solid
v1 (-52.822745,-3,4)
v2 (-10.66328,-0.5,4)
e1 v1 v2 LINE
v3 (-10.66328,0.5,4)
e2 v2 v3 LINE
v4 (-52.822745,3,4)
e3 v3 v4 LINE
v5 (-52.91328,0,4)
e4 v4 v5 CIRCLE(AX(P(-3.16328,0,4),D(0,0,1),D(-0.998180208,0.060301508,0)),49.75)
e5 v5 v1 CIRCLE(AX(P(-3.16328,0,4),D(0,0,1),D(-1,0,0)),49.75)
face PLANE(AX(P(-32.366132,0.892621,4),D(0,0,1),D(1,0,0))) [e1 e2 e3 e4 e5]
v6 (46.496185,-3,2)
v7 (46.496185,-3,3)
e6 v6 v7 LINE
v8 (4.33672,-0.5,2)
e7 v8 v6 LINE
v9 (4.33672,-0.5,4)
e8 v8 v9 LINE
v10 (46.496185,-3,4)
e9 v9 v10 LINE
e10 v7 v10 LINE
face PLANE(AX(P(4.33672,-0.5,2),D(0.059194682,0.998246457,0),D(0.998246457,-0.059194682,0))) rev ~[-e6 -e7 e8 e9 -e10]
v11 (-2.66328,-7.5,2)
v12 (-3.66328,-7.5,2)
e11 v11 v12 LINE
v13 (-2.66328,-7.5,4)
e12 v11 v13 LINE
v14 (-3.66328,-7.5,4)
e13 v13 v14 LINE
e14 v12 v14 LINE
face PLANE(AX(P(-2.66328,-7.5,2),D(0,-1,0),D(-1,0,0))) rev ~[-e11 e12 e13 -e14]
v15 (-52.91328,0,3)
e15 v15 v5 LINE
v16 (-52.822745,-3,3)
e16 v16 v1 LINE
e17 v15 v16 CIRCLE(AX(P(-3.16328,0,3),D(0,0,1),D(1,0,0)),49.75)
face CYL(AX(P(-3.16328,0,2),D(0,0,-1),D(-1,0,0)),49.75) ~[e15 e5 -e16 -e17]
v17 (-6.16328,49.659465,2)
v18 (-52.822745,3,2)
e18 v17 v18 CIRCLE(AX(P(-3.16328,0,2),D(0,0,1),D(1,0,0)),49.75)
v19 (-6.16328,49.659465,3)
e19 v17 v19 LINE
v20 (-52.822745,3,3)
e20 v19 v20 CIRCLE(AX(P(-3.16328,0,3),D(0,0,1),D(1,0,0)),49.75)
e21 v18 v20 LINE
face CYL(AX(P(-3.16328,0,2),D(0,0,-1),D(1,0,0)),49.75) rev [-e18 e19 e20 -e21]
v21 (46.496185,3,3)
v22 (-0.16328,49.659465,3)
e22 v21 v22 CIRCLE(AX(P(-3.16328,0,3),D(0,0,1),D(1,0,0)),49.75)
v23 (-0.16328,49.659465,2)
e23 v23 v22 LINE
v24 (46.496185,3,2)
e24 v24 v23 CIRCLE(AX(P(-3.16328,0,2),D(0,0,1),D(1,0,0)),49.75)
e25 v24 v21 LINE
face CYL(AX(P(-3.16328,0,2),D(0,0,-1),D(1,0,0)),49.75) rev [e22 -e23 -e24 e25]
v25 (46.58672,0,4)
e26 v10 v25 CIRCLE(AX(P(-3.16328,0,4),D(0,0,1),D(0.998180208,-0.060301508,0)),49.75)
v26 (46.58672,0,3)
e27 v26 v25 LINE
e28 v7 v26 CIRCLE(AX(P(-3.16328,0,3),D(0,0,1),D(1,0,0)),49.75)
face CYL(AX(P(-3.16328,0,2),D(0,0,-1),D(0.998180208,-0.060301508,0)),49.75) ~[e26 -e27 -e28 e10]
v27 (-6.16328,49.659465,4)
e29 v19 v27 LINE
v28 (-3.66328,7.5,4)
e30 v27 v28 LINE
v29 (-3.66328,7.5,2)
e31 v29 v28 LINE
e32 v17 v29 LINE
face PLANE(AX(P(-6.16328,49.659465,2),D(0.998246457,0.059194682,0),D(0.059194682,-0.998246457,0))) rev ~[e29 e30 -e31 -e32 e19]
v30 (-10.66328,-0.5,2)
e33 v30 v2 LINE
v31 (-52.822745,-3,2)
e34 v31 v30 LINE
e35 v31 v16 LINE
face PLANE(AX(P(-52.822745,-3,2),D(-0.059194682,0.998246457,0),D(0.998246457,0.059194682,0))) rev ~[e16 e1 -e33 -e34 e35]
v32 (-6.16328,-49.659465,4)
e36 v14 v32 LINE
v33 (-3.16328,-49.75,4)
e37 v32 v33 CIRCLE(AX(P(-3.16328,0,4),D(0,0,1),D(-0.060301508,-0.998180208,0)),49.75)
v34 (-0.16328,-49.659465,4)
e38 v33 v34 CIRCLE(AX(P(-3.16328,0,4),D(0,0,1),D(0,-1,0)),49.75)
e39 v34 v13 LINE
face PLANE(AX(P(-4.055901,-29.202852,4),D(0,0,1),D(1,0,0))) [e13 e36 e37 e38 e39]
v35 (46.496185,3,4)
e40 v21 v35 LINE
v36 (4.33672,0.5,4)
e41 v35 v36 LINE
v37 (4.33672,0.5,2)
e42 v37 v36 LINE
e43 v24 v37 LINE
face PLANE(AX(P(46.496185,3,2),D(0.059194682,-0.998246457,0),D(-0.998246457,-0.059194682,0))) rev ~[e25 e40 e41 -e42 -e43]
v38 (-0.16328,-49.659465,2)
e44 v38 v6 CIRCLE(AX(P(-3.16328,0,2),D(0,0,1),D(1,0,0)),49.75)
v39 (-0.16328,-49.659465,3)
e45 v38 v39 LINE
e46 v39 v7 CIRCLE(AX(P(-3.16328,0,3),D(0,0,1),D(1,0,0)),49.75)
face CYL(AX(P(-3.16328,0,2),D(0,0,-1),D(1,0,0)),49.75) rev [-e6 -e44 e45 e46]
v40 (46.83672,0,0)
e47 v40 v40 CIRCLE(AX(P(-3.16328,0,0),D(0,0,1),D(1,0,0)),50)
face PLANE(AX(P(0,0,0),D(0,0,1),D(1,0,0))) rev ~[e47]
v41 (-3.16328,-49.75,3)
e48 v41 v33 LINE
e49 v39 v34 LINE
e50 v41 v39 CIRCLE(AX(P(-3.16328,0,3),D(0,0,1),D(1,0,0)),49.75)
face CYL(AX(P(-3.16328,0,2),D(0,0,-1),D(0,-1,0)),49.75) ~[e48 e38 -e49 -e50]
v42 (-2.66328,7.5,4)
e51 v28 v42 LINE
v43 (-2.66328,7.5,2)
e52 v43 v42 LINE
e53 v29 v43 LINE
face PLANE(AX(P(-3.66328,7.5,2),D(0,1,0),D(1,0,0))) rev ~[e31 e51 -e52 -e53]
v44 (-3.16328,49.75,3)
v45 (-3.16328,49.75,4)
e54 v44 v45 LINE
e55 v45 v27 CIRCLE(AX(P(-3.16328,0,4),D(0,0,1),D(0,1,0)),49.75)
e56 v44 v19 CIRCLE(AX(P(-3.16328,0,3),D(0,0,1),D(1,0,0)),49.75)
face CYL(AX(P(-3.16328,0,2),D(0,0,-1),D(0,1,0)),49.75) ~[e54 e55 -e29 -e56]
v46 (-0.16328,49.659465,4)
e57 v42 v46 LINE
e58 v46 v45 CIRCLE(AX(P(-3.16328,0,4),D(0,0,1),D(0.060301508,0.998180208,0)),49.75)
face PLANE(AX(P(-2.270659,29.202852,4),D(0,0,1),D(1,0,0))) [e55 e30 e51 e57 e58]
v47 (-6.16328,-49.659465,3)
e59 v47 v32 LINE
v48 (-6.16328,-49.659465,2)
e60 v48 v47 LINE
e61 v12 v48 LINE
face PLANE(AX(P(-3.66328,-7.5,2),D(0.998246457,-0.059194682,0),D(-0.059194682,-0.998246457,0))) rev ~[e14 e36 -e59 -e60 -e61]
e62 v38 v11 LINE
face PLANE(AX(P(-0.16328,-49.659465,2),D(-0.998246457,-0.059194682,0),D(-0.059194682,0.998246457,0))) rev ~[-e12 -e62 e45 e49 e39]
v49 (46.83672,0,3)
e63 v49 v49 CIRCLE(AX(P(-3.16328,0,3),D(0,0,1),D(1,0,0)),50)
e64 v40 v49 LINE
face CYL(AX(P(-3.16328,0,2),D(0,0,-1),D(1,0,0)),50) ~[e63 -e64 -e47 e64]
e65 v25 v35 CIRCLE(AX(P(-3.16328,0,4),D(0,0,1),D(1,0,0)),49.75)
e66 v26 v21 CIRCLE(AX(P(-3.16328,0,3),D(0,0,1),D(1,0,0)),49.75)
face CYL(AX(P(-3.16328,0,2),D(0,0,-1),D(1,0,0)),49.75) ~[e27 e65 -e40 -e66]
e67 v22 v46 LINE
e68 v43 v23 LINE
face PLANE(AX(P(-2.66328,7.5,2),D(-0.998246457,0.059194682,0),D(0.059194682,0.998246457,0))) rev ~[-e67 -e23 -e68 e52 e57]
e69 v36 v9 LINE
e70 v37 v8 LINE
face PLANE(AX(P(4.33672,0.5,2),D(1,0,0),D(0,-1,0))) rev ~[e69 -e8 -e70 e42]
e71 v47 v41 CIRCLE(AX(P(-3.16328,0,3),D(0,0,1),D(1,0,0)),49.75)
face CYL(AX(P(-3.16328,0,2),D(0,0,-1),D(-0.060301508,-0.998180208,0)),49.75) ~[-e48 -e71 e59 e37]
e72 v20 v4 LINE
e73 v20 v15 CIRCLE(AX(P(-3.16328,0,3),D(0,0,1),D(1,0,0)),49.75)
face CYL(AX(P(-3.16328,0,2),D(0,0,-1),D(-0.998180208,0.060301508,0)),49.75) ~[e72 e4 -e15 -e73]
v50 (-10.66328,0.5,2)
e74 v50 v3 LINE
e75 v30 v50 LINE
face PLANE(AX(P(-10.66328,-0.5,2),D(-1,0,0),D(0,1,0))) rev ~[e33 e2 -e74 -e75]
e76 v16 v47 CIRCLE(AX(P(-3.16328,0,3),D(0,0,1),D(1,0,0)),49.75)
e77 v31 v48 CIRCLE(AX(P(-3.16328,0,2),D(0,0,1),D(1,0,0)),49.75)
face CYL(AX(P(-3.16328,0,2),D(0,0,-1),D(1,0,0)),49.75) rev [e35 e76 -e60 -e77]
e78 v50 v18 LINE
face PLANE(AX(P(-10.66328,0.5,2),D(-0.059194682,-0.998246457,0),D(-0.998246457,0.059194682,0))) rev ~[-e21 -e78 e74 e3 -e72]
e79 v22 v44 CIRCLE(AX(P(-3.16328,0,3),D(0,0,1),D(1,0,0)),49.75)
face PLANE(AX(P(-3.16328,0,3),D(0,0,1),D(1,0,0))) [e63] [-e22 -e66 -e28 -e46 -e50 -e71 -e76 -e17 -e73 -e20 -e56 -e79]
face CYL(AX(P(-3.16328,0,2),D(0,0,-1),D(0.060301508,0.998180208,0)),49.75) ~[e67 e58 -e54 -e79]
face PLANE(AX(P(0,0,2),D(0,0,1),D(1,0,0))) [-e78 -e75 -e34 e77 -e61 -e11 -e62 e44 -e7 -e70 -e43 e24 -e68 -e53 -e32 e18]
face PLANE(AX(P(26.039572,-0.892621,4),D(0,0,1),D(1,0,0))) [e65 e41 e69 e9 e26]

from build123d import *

# Parameters (mm, degrees)
F0_W      = 150
F0_H      = 140
F1_DEPTH  = 2
F2_R      = 2.5
F3_DEPTH  = 2.001
F4_R      = 50
F4_R_2    = 49.75
F5_DEPTH  = 1
F7_DEPTH  = 2
F8_DEPTH  = 25
F9_DEPTH  = 2.001
F10_DEPTH = 25


# Not quite as in the source:
# - a feature names something its author has since deleted; it is built from what else it names


with BuildPart() as f1:
    # F0 (on Top) → F1 (new body)
    with BuildSketch(Plane.XY):
        Rectangle(F0_W, F0_H)
    extrude(amount=F1_DEPTH)

    # F2 (on face) → F3 (cut, through all)
    with BuildSketch(Plane.XY.offset(2)):
        Polygon((-75, 70), (-75, 41.5), (-46.5, 70), align=None)
        with Locations((-64, 57.6)):
            Circle(F2_R, mode=Mode.SUBTRACT)
        Polygon((-46.5, -70), (-75, -41.5), (-75, -70), align=None)
        with Locations((-64, -57.6)):
            Circle(F2_R, mode=Mode.SUBTRACT)
        with BuildLine():
            Line((-67.1845650673, -7), (-67.1845650673, 7))
            ThreePointArc((-67.1845650673, 7), (-67.9167981143, 8.767766953), (-69.6845650673, 9.5))
            Line((-69.6845650673, 9.5), (-75, 9.5))
            Line((-75, 9.5), (-75, -9.5))
            Line((-75, -9.5), (-69.6845650673, -9.5))
            ThreePointArc((-69.6845650673, -9.5), (-67.9167981143, -8.767766953), (-67.1845650673, -7))
        make_face()
        with BuildLine():
            Line((-26.5348799016, -66.5942596452), (-27.945, -70))
            Line((-27.945, -70), (-15, -70))
            Line((-15, -70), (-16.5005719841, -66.5208040123))
            ThreePointArc((-16.5005719841, -66.5208040123), (-21.5420765789, -63.2311459437), (-26.5348799016, -66.5942596452))
        make_face()
        with BuildLine():
            Line((-15, 70), (-27.945, 70))
            Line((-27.945, 70), (-26.6428877925, 66.4417666182))
            ThreePointArc((-26.6428877925, 66.4417666182), (-21.596779976, 63.2315774362), (-16.6462859149, 66.5873377421))
            Line((-16.6462859149, 66.5873377421), (-15, 70))
        make_face()
        with Locations((-64, 57.6)):
            Circle(F2_R)
        with Locations((-64, -57.6)):
            Circle(F2_R)
    extrude(amount=-F3_DEPTH, mode=Mode.SUBTRACT)

    # F4 (on face) → F5 (join)
    with BuildSketch(Plane.XY.offset(2)):
        with Locations((-3.16328, 0)):
            Circle(F4_R)
        with Locations((-3.16328, 0)):
            Circle(F4_R_2, mode=Mode.SUBTRACT)
    extrude(amount=F5_DEPTH)

    # F6 (on face) → F7 (join)
    with BuildSketch(Plane.XY.offset(2)):
        with BuildLine():
            Line((-3.16328, 49.75), (-3.16328, 7.5))
            Line((-3.16328, 7.5), (-2.66328, 7.5))
            Line((-2.66328, 7.5), (-0.16328, 49.6594653616))
            ThreePointArc((-0.16328, 49.6594653616), (-1.662597112, 49.7273611895), (-3.16328, 49.75))
        make_face()
        with BuildLine():
            Line((46.58672, 0), (4.33672, 0))
            Line((4.33672, 0), (4.33672, -0.5))
            Line((4.33672, -0.5), (46.4961853616, -3))
            ThreePointArc((46.4961853616, -3), (46.5640811895, -1.500682888), (46.58672, 0))
        make_face()
        with BuildLine():
            ThreePointArc((-52.8227453616, 3), (-52.8906411895, 1.500682888), (-52.91328, 0))
            Line((-52.91328, 0), (-10.66328, 0))
            Line((-10.66328, 0), (-10.66328, 0.5))
            Line((-10.66328, 0.5), (-52.8227453616, 3))
        make_face()
        with BuildLine():
            Line((-3.66328, -7.5), (-6.16328, -49.6594653616))
            ThreePointArc((-6.16328, -49.6594653616), (-4.663962888, -49.7273611895), (-3.16328, -49.75))
            Line((-3.16328, -49.75), (-3.16328, -7.5))
            Line((-3.16328, -7.5), (-3.66328, -7.5))
        make_face()
        with BuildLine():
            Line((4.33672, 0.5), (4.33672, 0))
            Line((4.33672, 0), (46.58672, 0))
            ThreePointArc((46.58672, 0), (46.5640811895, 1.500682888), (46.4961853616, 3))
            Line((46.4961853616, 3), (4.33672, 0.5))
        make_face()
        with BuildLine():
            Line((-10.66328, 0), (-52.91328, 0))
            ThreePointArc((-52.91328, 0), (-52.8906411895, -1.500682888), (-52.8227453616, -3))
            Line((-52.8227453616, -3), (-10.66328, -0.5))
            Line((-10.66328, -0.5), (-10.66328, 0))
        make_face()
        with BuildLine():
            Line((-2.66328, -7.5), (-3.16328, -7.5))
            Line((-3.16328, -7.5), (-3.16328, -49.75))
            ThreePointArc((-3.16328, -49.75), (-1.662597112, -49.7273611895), (-0.16328, -49.6594653616))
            Line((-0.16328, -49.6594653616), (-2.66328, -7.5))
        make_face()
        with BuildLine():
            ThreePointArc((-3.16328, 49.75), (-4.663962888, 49.7273611895), (-6.16328, 49.6594653616))
            Line((-6.16328, 49.6594653616), (-3.66328, 7.5))
            Line((-3.66328, 7.5), (-3.16328, 7.5))
            Line((-3.16328, 7.5), (-3.16328, 49.75))
        make_face()
    extrude(amount=F7_DEPTH)

    # F2 (on face) → F8 (cut)
    with BuildSketch(Plane.XY.offset(2)):
        with Locations((-64, 57.6)):
            Circle(F2_R)
        with Locations((-64, -57.6)):
            Circle(F2_R)
        with BuildLine():
            Line((-15, 70), (-27.945, 70))
            Line((-27.945, 70), (-26.6428877925, 66.4417666182))
            ThreePointArc((-26.6428877925, 66.4417666182), (-21.596779976, 63.2315774362), (-16.6462859149, 66.5873377421))
            Line((-16.6462859149, 66.5873377421), (-15, 70))
        make_face()
        with BuildLine():
            Line((-26.5348799016, -66.5942596452), (-27.945, -70))
            Line((-27.945, -70), (-15, -70))
            Line((-15, -70), (-16.5005719841, -66.5208040123))
            ThreePointArc((-16.5005719841, -66.5208040123), (-21.5420765789, -63.2311459437), (-26.5348799016, -66.5942596452))
        make_face()
    extrude(amount=-F8_DEPTH, mode=Mode.SUBTRACT)

    # F2 (on face) + F4 (on face) → F9 (cut, through all)
    with BuildSketch(Plane.XY.offset(2)):
        with Locations((-64, 57.6)):
            Circle(F2_R)
        with Locations((-64, -57.6)):
            Circle(F2_R)
        with BuildLine():
            Line((-15, 70), (-27.945, 70))
            Line((-27.945, 70), (-26.6428877925, 66.4417666182))
            ThreePointArc((-26.6428877925, 66.4417666182), (-21.596779976, 63.2315774362), (-16.6462859149, 66.5873377421))
            Line((-16.6462859149, 66.5873377421), (-15, 70))
        make_face()
    with BuildSketch(Plane.XY.offset(2)):
        with BuildLine():
            Line((-16.5005719841, -66.5208040123), (-15, -70))
            Line((-15, -70), (75, -70))
            Line((75, -70), (75, 70))
            Line((75, 70), (-15, 70))
            Line((-15, 70), (-16.6462859149, 66.5873377421))
            ThreePointArc((-16.6462859149, 66.5873377421), (-21.596779976, 63.2315774362), (-26.6428877925, 66.4417666182))
            Line((-26.6428877925, 66.4417666182), (-27.945, 70))
            Line((-27.945, 70), (-46.5, 70))
            Line((-46.5, 70), (-75, 41.5))
            Line((-75, 41.5), (-75, 9.5))
            Line((-75, 9.5), (-69.6845650673, 9.5))
            ThreePointArc((-69.6845650673, 9.5), (-67.9167981143, 8.767766953), (-67.1845650673, 7))
            Line((-67.1845650673, 7), (-67.1845650673, -7))
            ThreePointArc((-67.1845650673, -7), (-67.9167981143, -8.767766953), (-69.6845650673, -9.5))
            Line((-69.6845650673, -9.5), (-75, -9.5))
            Line((-75, -9.5), (-75, -41.5))
            Line((-75, -41.5), (-46.5, -70))
            Line((-46.5, -70), (-27.945, -70))
            Line((-27.945, -70), (-26.5348799016, -66.5942596452))
            ThreePointArc((-26.5348799016, -66.5942596452), (-21.5420765789, -63.2311459437), (-16.5005719841, -66.5208040123))
        make_face()
        with Locations((-3.16328, 0)):
            Circle(F4_R, mode=Mode.SUBTRACT)
    extrude(amount=-F9_DEPTH, mode=Mode.SUBTRACT)

    # F2 (on face) + F0 (on Top) → F10 (cut)
    with BuildSketch(Plane.XY.offset(2)):
        Polygon((-46.5, -70), (-75, -41.5), (-75, -70), align=None)
        with Locations((-64, -57.6)):
            Circle(F2_R, mode=Mode.SUBTRACT)
        Polygon((-75, 70), (-75, 41.5), (-46.5, 70), align=None)
        with Locations((-64, 57.6)):
            Circle(F2_R, mode=Mode.SUBTRACT)
        with BuildLine():
            Line((-67.1845650673, -7), (-67.1845650673, 7))
            ThreePointArc((-67.1845650673, 7), (-67.9167981143, 8.767766953), (-69.6845650673, 9.5))
            Line((-69.6845650673, 9.5), (-75, 9.5))
            Line((-75, 9.5), (-75, -9.5))
            Line((-75, -9.5), (-69.6845650673, -9.5))
            ThreePointArc((-69.6845650673, -9.5), (-67.9167981143, -8.767766953), (-67.1845650673, -7))
        make_face()
        with BuildLine():
            Line((-26.5348799016, -66.5942596452), (-27.945, -70))
            Line((-27.945, -70), (-15, -70))
            Line((-15, -70), (-16.5005719841, -66.5208040123))
            ThreePointArc((-16.5005719841, -66.5208040123), (-21.5420765789, -63.2311459437), (-26.5348799016, -66.5942596452))
        make_face()
        with BuildLine():
            Line((-15, 70), (-27.945, 70))
            Line((-27.945, 70), (-26.6428877925, 66.4417666182))
            ThreePointArc((-26.6428877925, 66.4417666182), (-21.596779976, 63.2315774362), (-16.6462859149, 66.5873377421))
            Line((-16.6462859149, 66.5873377421), (-15, 70))
        make_face()
    with BuildSketch(Plane.XY):
        Rectangle(F0_W, F0_H)
    extrude(amount=-F10_DEPTH, mode=Mode.SUBTRACT)


solid = f1.part
